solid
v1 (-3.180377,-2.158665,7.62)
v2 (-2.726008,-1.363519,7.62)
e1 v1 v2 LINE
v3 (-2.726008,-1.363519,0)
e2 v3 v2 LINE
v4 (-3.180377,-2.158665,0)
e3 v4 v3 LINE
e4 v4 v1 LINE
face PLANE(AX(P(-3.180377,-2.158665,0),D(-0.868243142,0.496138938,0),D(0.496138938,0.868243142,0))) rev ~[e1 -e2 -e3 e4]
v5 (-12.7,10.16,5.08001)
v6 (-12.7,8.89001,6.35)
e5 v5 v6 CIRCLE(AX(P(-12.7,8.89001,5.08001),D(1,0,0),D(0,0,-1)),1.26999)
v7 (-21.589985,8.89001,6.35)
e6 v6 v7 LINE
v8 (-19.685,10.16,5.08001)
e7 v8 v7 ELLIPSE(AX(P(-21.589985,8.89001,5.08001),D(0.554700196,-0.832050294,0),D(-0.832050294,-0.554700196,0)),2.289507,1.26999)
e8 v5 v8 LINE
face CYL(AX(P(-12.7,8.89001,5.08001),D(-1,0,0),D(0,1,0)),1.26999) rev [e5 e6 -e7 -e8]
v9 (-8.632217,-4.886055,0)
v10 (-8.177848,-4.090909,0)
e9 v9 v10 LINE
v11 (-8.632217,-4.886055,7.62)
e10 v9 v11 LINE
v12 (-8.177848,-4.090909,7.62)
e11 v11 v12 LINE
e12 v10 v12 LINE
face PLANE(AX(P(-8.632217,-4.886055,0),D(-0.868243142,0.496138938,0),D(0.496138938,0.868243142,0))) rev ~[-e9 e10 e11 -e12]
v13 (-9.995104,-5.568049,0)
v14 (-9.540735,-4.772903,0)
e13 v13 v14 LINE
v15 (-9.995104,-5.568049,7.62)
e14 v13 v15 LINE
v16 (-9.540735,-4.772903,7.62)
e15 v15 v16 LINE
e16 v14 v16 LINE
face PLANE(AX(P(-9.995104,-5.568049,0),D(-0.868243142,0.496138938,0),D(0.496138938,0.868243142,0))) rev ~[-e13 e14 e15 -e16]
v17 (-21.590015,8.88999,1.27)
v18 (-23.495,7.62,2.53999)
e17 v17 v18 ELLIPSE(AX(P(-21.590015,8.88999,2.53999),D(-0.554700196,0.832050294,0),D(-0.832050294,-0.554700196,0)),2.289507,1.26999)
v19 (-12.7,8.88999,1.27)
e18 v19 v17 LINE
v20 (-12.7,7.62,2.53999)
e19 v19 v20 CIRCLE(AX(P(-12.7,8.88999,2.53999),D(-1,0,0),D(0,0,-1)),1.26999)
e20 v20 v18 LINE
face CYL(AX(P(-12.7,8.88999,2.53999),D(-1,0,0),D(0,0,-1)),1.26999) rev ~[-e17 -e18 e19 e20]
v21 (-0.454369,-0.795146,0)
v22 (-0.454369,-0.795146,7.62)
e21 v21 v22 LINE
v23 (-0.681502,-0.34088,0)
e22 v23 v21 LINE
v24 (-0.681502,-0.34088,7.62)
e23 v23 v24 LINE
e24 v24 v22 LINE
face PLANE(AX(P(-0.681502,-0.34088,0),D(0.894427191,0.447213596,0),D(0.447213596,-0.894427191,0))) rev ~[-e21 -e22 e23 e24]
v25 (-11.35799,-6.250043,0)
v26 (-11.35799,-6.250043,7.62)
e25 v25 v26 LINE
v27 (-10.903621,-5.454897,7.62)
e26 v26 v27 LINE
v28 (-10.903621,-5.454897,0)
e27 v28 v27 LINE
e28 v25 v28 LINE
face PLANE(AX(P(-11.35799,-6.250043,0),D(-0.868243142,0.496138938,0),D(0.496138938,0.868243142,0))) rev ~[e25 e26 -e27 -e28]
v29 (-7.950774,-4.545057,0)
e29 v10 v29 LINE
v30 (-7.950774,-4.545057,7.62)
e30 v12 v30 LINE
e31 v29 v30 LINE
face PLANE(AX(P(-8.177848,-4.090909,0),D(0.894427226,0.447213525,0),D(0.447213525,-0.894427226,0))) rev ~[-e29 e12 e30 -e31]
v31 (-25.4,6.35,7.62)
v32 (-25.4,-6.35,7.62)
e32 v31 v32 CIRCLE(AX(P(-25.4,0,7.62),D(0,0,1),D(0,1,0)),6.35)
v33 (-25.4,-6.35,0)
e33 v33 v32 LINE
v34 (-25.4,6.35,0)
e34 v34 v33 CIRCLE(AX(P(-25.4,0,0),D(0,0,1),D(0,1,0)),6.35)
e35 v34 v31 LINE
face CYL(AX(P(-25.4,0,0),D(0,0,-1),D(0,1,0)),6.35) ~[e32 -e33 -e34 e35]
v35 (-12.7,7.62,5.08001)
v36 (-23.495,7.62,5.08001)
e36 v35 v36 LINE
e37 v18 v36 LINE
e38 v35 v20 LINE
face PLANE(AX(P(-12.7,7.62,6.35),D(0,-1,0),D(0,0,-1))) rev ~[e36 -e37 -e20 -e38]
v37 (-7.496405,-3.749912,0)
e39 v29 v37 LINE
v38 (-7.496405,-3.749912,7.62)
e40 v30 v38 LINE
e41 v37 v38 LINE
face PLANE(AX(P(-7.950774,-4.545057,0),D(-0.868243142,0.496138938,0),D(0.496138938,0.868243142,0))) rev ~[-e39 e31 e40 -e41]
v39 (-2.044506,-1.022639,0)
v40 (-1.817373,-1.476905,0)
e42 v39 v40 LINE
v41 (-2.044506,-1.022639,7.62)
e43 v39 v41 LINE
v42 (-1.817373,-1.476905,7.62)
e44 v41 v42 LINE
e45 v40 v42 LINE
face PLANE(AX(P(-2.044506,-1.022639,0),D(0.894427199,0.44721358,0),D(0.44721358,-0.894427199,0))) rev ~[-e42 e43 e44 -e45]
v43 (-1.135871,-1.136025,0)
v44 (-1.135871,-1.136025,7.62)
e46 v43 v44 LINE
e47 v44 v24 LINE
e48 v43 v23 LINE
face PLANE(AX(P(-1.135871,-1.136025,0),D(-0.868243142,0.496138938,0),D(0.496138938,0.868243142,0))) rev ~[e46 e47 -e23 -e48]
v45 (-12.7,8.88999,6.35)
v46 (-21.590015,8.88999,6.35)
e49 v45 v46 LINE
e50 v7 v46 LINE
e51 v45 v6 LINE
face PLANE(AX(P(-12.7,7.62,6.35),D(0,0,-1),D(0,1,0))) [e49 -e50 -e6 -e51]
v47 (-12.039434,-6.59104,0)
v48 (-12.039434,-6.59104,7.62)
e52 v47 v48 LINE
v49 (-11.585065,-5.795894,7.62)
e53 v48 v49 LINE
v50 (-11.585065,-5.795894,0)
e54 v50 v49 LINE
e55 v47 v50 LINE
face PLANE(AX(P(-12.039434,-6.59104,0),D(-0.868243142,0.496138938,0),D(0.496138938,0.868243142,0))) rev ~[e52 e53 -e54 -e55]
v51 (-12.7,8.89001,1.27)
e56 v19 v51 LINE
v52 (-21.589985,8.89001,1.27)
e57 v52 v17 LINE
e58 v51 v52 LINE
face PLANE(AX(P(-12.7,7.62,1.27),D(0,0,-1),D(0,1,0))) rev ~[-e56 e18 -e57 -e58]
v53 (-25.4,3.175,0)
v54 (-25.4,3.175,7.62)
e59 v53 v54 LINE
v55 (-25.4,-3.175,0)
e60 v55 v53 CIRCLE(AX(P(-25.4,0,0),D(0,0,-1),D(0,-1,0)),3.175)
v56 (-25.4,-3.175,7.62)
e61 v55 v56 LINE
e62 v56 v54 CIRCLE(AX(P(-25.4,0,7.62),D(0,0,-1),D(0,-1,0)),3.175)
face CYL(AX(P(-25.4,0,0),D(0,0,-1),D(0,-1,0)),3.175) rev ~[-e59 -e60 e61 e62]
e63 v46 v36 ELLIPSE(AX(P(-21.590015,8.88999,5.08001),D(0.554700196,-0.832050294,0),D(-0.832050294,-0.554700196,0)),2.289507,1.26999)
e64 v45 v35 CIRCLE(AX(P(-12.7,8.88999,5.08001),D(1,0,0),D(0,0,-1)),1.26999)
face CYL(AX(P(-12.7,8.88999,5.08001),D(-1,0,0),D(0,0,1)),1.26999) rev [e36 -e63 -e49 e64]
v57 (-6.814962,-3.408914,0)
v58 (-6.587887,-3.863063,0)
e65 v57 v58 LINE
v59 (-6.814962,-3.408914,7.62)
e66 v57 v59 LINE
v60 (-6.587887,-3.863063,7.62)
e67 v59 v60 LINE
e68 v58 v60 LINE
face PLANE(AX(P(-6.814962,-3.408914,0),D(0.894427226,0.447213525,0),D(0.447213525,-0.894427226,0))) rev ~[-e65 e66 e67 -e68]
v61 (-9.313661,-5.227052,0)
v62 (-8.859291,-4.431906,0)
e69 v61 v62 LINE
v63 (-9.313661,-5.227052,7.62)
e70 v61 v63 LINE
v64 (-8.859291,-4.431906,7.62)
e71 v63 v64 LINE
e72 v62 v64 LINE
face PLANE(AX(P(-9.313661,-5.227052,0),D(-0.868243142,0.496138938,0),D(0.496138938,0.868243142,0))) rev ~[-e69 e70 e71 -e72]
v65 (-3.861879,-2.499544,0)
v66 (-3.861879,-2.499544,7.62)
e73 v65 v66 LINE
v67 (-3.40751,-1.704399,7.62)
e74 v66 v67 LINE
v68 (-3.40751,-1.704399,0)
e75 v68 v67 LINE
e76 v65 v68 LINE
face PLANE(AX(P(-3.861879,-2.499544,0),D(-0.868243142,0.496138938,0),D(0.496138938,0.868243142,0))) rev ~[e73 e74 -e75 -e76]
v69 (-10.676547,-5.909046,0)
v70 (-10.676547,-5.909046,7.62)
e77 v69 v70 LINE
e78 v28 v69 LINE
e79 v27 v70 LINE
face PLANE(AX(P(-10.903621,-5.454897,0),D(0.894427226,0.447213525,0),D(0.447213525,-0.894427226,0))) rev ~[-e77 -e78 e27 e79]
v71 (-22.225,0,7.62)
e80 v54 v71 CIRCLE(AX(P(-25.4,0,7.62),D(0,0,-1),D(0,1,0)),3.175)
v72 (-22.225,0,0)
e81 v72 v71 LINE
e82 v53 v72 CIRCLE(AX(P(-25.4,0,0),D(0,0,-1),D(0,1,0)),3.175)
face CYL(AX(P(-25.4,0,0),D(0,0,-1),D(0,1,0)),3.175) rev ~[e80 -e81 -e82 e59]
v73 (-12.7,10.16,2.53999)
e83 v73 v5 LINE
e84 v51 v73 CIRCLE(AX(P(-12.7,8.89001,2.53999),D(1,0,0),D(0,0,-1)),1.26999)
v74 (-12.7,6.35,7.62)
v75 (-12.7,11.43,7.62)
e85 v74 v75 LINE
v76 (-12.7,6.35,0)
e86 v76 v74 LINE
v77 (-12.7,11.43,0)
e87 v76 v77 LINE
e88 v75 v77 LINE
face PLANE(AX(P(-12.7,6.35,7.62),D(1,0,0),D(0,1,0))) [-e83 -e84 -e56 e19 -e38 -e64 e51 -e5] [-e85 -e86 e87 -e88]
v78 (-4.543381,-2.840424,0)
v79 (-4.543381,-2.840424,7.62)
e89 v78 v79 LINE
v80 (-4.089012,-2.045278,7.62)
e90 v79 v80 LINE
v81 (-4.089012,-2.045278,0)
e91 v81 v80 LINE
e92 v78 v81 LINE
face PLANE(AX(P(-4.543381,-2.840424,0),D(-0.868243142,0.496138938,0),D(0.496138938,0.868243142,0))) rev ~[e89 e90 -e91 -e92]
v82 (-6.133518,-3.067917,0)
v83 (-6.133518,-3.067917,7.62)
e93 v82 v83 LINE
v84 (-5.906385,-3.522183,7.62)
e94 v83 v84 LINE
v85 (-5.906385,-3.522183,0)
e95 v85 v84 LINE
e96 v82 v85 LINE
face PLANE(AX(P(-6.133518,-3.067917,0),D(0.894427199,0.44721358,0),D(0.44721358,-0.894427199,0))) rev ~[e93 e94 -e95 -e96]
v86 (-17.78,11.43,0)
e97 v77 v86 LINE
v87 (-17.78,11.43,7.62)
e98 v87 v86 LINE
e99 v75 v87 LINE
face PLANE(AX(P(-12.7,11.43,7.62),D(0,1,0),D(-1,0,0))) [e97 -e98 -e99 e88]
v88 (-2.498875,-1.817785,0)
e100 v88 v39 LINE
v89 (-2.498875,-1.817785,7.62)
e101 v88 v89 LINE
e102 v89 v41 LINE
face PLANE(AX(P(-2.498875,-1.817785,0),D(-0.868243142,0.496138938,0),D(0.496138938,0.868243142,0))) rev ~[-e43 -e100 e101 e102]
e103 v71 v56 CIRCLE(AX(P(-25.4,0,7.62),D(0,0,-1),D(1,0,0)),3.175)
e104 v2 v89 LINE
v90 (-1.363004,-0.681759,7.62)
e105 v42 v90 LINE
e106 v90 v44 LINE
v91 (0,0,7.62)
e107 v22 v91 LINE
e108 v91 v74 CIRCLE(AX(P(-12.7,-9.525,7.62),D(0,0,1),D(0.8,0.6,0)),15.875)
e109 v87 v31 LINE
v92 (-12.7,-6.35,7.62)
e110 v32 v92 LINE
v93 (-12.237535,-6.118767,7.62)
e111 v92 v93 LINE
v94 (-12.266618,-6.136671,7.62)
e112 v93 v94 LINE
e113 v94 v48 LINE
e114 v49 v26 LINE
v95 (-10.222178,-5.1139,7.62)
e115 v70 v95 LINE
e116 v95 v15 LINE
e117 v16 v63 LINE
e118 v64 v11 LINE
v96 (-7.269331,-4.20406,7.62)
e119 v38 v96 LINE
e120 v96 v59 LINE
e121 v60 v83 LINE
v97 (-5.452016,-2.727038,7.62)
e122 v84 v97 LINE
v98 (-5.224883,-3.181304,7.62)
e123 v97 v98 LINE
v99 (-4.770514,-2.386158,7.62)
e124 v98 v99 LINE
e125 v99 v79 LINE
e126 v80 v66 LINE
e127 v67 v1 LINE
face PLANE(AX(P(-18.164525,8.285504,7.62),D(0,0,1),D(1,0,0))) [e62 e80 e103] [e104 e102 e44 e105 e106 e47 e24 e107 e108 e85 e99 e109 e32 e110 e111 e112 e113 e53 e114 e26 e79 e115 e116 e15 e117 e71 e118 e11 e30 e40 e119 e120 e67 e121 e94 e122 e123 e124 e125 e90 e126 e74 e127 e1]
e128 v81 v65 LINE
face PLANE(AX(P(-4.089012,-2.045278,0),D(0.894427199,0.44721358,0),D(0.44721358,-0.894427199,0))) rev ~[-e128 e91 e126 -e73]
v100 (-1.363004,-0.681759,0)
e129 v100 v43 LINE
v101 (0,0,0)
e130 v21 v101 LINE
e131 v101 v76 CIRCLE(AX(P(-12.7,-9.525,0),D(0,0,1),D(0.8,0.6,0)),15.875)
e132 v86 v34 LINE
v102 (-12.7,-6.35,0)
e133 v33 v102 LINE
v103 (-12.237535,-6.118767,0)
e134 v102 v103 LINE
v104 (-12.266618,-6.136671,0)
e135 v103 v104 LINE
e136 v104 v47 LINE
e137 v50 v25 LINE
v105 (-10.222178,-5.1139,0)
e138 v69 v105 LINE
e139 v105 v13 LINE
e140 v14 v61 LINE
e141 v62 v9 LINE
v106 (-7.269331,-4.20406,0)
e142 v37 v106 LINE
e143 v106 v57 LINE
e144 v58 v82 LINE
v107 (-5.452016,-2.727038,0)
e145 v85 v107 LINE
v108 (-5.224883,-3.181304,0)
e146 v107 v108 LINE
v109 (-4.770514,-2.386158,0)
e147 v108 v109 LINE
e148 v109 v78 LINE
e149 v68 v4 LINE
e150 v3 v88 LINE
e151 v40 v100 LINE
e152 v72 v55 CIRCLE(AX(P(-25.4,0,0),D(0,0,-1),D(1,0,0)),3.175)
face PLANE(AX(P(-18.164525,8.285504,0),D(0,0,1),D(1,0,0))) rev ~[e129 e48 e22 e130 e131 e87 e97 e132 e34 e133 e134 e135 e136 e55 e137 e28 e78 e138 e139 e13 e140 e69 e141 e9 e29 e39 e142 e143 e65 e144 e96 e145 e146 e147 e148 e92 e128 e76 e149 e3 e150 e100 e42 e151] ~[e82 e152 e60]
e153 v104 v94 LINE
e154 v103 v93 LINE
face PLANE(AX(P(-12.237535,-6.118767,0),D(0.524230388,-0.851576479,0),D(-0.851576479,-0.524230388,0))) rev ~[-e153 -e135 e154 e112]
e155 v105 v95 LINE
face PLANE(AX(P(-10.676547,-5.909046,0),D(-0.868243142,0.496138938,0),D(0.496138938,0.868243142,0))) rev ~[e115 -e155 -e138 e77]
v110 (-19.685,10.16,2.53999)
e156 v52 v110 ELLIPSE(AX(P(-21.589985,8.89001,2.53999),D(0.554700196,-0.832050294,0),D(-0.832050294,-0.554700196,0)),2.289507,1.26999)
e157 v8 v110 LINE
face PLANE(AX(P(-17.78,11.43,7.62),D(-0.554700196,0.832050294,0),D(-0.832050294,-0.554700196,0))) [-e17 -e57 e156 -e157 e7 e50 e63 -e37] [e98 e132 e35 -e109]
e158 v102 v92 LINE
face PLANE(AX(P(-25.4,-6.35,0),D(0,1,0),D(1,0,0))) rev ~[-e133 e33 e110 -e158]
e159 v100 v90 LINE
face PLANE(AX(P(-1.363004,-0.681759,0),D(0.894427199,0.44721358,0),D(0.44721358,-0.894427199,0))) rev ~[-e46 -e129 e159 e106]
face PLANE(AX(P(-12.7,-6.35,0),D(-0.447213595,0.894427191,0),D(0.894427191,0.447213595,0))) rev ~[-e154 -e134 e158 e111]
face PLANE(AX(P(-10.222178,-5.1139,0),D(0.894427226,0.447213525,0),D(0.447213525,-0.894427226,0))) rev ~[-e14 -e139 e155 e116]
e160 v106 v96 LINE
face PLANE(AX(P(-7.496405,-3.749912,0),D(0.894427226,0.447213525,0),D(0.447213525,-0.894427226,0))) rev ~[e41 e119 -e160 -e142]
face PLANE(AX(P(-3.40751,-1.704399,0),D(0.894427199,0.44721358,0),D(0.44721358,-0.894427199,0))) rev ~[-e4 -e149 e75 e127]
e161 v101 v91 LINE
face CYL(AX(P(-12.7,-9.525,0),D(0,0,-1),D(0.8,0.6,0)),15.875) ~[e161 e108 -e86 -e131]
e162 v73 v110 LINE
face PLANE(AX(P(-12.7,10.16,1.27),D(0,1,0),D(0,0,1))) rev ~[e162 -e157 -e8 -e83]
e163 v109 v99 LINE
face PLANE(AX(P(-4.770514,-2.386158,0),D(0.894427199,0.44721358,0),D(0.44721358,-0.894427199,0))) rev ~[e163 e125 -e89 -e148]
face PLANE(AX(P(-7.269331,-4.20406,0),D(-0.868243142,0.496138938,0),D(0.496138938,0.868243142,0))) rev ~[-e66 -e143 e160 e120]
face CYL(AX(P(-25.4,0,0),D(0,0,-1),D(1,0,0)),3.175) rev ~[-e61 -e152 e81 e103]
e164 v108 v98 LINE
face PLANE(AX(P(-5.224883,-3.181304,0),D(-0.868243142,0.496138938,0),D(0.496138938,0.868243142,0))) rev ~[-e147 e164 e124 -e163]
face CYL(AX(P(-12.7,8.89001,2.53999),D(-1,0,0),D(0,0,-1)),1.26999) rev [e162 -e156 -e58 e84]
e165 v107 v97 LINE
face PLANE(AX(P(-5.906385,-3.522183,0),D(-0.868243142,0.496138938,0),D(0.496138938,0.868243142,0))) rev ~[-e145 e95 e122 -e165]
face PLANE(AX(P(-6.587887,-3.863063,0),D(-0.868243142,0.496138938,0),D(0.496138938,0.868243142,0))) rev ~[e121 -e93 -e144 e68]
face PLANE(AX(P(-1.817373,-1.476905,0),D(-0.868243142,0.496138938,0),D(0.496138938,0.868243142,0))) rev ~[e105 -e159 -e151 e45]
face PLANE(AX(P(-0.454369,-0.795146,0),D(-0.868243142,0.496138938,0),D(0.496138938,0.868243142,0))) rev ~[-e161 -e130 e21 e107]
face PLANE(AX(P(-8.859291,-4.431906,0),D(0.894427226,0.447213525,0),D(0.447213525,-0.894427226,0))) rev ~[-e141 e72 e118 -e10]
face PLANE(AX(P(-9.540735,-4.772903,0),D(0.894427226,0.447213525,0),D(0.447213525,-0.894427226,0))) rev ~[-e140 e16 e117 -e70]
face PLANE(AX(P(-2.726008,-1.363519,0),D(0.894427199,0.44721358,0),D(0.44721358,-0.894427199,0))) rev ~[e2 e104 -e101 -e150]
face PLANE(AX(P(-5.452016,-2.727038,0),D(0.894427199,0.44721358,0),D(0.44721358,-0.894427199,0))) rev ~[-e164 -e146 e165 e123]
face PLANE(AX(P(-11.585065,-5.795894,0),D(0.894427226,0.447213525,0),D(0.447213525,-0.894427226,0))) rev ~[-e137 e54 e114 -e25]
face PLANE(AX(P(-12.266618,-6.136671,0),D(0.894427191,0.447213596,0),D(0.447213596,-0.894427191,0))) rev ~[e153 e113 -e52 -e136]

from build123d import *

# Parameters (mm, degrees)
F1_DEPTH = 7.62
F3_DEPTH = 7.62
F4_W     = 2.54
F4_H     = 2.54
F5_DEPTH = 25.4
F6_R     = 1.26999


# Not quite as in the source:
# - a fillet or chamfer is up to 0.001 mm smaller than in the source, because OpenCascade refuses the exact size


with BuildPart() as f1:
    # F0 (on Top) → F1 (new body)
    with BuildSketch(Plane.XY):
        with BuildLine():
            Line((-12.7, -6.35), (-12.7, 0))
            Line((-12.7, 0), (-19.05, 0))
            ThreePointArc((-19.05, 0), (-20.9098719395, -4.4901280605), (-25.4, -6.35))
            Line((-25.4, -6.35), (-12.7, -6.35))
        make_face()
        with BuildLine():
            Line((-12.7, 6.35), (-12.7, 0))
            Line((-12.7, 0), (-2.2980148465, 0))
            Line((-2.2980148465, 0), (-1.3816523133, 0.5641126772))
            Line((-1.3816523133, 0.5641126772), (0, 0))
            ThreePointArc((0, 0), (-5.6004841714, 4.6740316571), (-12.7, 6.35))
        make_face()
        with BuildLine():
            Line((-19.05, 0), (-12.7, 0))
            Line((-12.7, 0), (-12.7, 6.35))
            Line((-12.7, 6.35), (-25.4, 6.35))
            ThreePointArc((-25.4, 6.35), (-20.9098719395, 4.4901280605), (-19.05, 0))
        make_face()
        Polygon((-2.2980148465, 0), (-12.7, 0), (-12.7, -6.35), (-12.2375346417, -6.1187673209), align=None)
        with BuildLine():
            ThreePointArc((-25.4, -6.35), (-20.9098719395, -4.4901280605), (-19.05, 0))
            Line((-19.05, 0), (-22.225, 0))
            ThreePointArc((-22.225, 0), (-23.1549359697, -2.2450640303), (-25.4, -3.175))
            Line((-25.4, -3.175), (-25.4, -6.35))
        make_face()
        with BuildLine():
            Line((-22.225, 0), (-19.05, 0))
            ThreePointArc((-19.05, 0), (-20.9098719395, 4.4901280605), (-25.4, 6.35))
            Line((-25.4, 6.35), (-25.4, 3.175))
            ThreePointArc((-25.4, 3.175), (-23.1549359697, 2.2450640303), (-22.225, 0))
        make_face()
        Polygon((-1.3816523133, 0.5641126772), (-2.2980148465, 0), (0, 0), align=None)
        Polygon((0, 0), (-2.2980148465, 0), (-12.2375346417, -6.1187673209), (-0.6815535195, -0.3407767598), align=None)
        with BuildLine():
            Line((-25.4, 3.175), (-25.4, 6.35))
            ThreePointArc((-25.4, 6.35), (-31.75, 0), (-25.4, -6.35))
            Line((-25.4, -6.35), (-25.4, -3.175))
            ThreePointArc((-25.4, -3.175), (-28.575, 0), (-25.4, 3.175))
        make_face()
        Polygon((-0.454369013, -0.7951457728), (0, 0), (-0.6815535195, -0.3407767598), (-0.6815020435, -0.3408797119), align=None)
        Polygon((-0.6815535195, -0.3407767598), (-12.2375346417, -6.1187673209), (-12.2666181754, -6.1366711411), (-11.5850646558, -5.7958943813), (-11.3579903771, -6.2500430279), (-10.903621364, -5.4548972551), (-10.6765470852, -5.9090459018), (-10.2221780722, -5.113900129), (-9.9951037934, -5.5680487756), (-9.5407347804, -4.7729030028), (-9.3136605016, -5.2270516495), (-8.8592914886, -4.4319058767), (-8.6322172098, -4.8860545233), (-8.1778481968, -4.0909087505), (-7.950773918, -4.5450573971), (-7.496404905, -3.7499116243), (-7.2693306262, -4.204060271), (-6.8149616132, -3.4089144982), (-6.5878873344, -3.8630631448), (-6.1335183214, -3.067917372), (-5.9063852987, -3.5221834368), (-5.4520162857, -2.727037664), (-5.224883263, -3.1813037288), (-4.7705142499, -2.386157956), (-4.5433812273, -2.8404240208), (-4.0890122142, -2.045278248), (-3.8618791916, -2.4995443128), (-3.4075101785, -1.70439854), (-3.1803771559, -2.1586646048), (-2.7260081428, -1.363518832), (-2.4988751201, -1.8177848968), (-2.0445061071, -1.022639124), (-1.8173730844, -1.4769051888), (-1.3630040714, -0.681759416), (-1.1358710487, -1.1360254808), (-0.6815020357, -0.340879708), align=None)
        Polygon((-11.5850646558, -5.7958943813), (-12.2666181754, -6.1366711411), (-12.0394336689, -6.5910401541), align=None)
    extrude(amount=F1_DEPTH)

    # F2 (on face) → F3 (join)
    with BuildSketch(Plane.XY.offset(7.62)):
        Polygon((-25.4, 6.35), (-12.7, 6.35), (-12.7, 11.43), (-17.78, 11.43), align=None)
    extrude(amount=-F3_DEPTH)

    # F4 (on face) → F5 (cut)
    with BuildSketch(Plane.YZ.offset(-12.7)):
        with Locations((8.89, 2.54)):
            Rectangle(F4_W, F4_H)
        with Locations((8.89, 5.08)):
            Rectangle(F4_W, F4_H)
    extrude(amount=-F5_DEPTH, mode=Mode.SUBTRACT)

    # F6 (radius 1.27 in the source; OpenCascade refuses exactly that, so slightly less here)
    f6_edges = [f1.edges().sort_by_distance(p)[0] for p in [
        (-18.0975, 7.62, 1.27),
        (-18.0975, 7.62, 6.35),
        (-16.1925, 10.16, 6.35),
        (-16.1925, 10.16, 1.27),
    ]]
    fillet(f6_edges, radius=F6_R)


solid = f1.part
